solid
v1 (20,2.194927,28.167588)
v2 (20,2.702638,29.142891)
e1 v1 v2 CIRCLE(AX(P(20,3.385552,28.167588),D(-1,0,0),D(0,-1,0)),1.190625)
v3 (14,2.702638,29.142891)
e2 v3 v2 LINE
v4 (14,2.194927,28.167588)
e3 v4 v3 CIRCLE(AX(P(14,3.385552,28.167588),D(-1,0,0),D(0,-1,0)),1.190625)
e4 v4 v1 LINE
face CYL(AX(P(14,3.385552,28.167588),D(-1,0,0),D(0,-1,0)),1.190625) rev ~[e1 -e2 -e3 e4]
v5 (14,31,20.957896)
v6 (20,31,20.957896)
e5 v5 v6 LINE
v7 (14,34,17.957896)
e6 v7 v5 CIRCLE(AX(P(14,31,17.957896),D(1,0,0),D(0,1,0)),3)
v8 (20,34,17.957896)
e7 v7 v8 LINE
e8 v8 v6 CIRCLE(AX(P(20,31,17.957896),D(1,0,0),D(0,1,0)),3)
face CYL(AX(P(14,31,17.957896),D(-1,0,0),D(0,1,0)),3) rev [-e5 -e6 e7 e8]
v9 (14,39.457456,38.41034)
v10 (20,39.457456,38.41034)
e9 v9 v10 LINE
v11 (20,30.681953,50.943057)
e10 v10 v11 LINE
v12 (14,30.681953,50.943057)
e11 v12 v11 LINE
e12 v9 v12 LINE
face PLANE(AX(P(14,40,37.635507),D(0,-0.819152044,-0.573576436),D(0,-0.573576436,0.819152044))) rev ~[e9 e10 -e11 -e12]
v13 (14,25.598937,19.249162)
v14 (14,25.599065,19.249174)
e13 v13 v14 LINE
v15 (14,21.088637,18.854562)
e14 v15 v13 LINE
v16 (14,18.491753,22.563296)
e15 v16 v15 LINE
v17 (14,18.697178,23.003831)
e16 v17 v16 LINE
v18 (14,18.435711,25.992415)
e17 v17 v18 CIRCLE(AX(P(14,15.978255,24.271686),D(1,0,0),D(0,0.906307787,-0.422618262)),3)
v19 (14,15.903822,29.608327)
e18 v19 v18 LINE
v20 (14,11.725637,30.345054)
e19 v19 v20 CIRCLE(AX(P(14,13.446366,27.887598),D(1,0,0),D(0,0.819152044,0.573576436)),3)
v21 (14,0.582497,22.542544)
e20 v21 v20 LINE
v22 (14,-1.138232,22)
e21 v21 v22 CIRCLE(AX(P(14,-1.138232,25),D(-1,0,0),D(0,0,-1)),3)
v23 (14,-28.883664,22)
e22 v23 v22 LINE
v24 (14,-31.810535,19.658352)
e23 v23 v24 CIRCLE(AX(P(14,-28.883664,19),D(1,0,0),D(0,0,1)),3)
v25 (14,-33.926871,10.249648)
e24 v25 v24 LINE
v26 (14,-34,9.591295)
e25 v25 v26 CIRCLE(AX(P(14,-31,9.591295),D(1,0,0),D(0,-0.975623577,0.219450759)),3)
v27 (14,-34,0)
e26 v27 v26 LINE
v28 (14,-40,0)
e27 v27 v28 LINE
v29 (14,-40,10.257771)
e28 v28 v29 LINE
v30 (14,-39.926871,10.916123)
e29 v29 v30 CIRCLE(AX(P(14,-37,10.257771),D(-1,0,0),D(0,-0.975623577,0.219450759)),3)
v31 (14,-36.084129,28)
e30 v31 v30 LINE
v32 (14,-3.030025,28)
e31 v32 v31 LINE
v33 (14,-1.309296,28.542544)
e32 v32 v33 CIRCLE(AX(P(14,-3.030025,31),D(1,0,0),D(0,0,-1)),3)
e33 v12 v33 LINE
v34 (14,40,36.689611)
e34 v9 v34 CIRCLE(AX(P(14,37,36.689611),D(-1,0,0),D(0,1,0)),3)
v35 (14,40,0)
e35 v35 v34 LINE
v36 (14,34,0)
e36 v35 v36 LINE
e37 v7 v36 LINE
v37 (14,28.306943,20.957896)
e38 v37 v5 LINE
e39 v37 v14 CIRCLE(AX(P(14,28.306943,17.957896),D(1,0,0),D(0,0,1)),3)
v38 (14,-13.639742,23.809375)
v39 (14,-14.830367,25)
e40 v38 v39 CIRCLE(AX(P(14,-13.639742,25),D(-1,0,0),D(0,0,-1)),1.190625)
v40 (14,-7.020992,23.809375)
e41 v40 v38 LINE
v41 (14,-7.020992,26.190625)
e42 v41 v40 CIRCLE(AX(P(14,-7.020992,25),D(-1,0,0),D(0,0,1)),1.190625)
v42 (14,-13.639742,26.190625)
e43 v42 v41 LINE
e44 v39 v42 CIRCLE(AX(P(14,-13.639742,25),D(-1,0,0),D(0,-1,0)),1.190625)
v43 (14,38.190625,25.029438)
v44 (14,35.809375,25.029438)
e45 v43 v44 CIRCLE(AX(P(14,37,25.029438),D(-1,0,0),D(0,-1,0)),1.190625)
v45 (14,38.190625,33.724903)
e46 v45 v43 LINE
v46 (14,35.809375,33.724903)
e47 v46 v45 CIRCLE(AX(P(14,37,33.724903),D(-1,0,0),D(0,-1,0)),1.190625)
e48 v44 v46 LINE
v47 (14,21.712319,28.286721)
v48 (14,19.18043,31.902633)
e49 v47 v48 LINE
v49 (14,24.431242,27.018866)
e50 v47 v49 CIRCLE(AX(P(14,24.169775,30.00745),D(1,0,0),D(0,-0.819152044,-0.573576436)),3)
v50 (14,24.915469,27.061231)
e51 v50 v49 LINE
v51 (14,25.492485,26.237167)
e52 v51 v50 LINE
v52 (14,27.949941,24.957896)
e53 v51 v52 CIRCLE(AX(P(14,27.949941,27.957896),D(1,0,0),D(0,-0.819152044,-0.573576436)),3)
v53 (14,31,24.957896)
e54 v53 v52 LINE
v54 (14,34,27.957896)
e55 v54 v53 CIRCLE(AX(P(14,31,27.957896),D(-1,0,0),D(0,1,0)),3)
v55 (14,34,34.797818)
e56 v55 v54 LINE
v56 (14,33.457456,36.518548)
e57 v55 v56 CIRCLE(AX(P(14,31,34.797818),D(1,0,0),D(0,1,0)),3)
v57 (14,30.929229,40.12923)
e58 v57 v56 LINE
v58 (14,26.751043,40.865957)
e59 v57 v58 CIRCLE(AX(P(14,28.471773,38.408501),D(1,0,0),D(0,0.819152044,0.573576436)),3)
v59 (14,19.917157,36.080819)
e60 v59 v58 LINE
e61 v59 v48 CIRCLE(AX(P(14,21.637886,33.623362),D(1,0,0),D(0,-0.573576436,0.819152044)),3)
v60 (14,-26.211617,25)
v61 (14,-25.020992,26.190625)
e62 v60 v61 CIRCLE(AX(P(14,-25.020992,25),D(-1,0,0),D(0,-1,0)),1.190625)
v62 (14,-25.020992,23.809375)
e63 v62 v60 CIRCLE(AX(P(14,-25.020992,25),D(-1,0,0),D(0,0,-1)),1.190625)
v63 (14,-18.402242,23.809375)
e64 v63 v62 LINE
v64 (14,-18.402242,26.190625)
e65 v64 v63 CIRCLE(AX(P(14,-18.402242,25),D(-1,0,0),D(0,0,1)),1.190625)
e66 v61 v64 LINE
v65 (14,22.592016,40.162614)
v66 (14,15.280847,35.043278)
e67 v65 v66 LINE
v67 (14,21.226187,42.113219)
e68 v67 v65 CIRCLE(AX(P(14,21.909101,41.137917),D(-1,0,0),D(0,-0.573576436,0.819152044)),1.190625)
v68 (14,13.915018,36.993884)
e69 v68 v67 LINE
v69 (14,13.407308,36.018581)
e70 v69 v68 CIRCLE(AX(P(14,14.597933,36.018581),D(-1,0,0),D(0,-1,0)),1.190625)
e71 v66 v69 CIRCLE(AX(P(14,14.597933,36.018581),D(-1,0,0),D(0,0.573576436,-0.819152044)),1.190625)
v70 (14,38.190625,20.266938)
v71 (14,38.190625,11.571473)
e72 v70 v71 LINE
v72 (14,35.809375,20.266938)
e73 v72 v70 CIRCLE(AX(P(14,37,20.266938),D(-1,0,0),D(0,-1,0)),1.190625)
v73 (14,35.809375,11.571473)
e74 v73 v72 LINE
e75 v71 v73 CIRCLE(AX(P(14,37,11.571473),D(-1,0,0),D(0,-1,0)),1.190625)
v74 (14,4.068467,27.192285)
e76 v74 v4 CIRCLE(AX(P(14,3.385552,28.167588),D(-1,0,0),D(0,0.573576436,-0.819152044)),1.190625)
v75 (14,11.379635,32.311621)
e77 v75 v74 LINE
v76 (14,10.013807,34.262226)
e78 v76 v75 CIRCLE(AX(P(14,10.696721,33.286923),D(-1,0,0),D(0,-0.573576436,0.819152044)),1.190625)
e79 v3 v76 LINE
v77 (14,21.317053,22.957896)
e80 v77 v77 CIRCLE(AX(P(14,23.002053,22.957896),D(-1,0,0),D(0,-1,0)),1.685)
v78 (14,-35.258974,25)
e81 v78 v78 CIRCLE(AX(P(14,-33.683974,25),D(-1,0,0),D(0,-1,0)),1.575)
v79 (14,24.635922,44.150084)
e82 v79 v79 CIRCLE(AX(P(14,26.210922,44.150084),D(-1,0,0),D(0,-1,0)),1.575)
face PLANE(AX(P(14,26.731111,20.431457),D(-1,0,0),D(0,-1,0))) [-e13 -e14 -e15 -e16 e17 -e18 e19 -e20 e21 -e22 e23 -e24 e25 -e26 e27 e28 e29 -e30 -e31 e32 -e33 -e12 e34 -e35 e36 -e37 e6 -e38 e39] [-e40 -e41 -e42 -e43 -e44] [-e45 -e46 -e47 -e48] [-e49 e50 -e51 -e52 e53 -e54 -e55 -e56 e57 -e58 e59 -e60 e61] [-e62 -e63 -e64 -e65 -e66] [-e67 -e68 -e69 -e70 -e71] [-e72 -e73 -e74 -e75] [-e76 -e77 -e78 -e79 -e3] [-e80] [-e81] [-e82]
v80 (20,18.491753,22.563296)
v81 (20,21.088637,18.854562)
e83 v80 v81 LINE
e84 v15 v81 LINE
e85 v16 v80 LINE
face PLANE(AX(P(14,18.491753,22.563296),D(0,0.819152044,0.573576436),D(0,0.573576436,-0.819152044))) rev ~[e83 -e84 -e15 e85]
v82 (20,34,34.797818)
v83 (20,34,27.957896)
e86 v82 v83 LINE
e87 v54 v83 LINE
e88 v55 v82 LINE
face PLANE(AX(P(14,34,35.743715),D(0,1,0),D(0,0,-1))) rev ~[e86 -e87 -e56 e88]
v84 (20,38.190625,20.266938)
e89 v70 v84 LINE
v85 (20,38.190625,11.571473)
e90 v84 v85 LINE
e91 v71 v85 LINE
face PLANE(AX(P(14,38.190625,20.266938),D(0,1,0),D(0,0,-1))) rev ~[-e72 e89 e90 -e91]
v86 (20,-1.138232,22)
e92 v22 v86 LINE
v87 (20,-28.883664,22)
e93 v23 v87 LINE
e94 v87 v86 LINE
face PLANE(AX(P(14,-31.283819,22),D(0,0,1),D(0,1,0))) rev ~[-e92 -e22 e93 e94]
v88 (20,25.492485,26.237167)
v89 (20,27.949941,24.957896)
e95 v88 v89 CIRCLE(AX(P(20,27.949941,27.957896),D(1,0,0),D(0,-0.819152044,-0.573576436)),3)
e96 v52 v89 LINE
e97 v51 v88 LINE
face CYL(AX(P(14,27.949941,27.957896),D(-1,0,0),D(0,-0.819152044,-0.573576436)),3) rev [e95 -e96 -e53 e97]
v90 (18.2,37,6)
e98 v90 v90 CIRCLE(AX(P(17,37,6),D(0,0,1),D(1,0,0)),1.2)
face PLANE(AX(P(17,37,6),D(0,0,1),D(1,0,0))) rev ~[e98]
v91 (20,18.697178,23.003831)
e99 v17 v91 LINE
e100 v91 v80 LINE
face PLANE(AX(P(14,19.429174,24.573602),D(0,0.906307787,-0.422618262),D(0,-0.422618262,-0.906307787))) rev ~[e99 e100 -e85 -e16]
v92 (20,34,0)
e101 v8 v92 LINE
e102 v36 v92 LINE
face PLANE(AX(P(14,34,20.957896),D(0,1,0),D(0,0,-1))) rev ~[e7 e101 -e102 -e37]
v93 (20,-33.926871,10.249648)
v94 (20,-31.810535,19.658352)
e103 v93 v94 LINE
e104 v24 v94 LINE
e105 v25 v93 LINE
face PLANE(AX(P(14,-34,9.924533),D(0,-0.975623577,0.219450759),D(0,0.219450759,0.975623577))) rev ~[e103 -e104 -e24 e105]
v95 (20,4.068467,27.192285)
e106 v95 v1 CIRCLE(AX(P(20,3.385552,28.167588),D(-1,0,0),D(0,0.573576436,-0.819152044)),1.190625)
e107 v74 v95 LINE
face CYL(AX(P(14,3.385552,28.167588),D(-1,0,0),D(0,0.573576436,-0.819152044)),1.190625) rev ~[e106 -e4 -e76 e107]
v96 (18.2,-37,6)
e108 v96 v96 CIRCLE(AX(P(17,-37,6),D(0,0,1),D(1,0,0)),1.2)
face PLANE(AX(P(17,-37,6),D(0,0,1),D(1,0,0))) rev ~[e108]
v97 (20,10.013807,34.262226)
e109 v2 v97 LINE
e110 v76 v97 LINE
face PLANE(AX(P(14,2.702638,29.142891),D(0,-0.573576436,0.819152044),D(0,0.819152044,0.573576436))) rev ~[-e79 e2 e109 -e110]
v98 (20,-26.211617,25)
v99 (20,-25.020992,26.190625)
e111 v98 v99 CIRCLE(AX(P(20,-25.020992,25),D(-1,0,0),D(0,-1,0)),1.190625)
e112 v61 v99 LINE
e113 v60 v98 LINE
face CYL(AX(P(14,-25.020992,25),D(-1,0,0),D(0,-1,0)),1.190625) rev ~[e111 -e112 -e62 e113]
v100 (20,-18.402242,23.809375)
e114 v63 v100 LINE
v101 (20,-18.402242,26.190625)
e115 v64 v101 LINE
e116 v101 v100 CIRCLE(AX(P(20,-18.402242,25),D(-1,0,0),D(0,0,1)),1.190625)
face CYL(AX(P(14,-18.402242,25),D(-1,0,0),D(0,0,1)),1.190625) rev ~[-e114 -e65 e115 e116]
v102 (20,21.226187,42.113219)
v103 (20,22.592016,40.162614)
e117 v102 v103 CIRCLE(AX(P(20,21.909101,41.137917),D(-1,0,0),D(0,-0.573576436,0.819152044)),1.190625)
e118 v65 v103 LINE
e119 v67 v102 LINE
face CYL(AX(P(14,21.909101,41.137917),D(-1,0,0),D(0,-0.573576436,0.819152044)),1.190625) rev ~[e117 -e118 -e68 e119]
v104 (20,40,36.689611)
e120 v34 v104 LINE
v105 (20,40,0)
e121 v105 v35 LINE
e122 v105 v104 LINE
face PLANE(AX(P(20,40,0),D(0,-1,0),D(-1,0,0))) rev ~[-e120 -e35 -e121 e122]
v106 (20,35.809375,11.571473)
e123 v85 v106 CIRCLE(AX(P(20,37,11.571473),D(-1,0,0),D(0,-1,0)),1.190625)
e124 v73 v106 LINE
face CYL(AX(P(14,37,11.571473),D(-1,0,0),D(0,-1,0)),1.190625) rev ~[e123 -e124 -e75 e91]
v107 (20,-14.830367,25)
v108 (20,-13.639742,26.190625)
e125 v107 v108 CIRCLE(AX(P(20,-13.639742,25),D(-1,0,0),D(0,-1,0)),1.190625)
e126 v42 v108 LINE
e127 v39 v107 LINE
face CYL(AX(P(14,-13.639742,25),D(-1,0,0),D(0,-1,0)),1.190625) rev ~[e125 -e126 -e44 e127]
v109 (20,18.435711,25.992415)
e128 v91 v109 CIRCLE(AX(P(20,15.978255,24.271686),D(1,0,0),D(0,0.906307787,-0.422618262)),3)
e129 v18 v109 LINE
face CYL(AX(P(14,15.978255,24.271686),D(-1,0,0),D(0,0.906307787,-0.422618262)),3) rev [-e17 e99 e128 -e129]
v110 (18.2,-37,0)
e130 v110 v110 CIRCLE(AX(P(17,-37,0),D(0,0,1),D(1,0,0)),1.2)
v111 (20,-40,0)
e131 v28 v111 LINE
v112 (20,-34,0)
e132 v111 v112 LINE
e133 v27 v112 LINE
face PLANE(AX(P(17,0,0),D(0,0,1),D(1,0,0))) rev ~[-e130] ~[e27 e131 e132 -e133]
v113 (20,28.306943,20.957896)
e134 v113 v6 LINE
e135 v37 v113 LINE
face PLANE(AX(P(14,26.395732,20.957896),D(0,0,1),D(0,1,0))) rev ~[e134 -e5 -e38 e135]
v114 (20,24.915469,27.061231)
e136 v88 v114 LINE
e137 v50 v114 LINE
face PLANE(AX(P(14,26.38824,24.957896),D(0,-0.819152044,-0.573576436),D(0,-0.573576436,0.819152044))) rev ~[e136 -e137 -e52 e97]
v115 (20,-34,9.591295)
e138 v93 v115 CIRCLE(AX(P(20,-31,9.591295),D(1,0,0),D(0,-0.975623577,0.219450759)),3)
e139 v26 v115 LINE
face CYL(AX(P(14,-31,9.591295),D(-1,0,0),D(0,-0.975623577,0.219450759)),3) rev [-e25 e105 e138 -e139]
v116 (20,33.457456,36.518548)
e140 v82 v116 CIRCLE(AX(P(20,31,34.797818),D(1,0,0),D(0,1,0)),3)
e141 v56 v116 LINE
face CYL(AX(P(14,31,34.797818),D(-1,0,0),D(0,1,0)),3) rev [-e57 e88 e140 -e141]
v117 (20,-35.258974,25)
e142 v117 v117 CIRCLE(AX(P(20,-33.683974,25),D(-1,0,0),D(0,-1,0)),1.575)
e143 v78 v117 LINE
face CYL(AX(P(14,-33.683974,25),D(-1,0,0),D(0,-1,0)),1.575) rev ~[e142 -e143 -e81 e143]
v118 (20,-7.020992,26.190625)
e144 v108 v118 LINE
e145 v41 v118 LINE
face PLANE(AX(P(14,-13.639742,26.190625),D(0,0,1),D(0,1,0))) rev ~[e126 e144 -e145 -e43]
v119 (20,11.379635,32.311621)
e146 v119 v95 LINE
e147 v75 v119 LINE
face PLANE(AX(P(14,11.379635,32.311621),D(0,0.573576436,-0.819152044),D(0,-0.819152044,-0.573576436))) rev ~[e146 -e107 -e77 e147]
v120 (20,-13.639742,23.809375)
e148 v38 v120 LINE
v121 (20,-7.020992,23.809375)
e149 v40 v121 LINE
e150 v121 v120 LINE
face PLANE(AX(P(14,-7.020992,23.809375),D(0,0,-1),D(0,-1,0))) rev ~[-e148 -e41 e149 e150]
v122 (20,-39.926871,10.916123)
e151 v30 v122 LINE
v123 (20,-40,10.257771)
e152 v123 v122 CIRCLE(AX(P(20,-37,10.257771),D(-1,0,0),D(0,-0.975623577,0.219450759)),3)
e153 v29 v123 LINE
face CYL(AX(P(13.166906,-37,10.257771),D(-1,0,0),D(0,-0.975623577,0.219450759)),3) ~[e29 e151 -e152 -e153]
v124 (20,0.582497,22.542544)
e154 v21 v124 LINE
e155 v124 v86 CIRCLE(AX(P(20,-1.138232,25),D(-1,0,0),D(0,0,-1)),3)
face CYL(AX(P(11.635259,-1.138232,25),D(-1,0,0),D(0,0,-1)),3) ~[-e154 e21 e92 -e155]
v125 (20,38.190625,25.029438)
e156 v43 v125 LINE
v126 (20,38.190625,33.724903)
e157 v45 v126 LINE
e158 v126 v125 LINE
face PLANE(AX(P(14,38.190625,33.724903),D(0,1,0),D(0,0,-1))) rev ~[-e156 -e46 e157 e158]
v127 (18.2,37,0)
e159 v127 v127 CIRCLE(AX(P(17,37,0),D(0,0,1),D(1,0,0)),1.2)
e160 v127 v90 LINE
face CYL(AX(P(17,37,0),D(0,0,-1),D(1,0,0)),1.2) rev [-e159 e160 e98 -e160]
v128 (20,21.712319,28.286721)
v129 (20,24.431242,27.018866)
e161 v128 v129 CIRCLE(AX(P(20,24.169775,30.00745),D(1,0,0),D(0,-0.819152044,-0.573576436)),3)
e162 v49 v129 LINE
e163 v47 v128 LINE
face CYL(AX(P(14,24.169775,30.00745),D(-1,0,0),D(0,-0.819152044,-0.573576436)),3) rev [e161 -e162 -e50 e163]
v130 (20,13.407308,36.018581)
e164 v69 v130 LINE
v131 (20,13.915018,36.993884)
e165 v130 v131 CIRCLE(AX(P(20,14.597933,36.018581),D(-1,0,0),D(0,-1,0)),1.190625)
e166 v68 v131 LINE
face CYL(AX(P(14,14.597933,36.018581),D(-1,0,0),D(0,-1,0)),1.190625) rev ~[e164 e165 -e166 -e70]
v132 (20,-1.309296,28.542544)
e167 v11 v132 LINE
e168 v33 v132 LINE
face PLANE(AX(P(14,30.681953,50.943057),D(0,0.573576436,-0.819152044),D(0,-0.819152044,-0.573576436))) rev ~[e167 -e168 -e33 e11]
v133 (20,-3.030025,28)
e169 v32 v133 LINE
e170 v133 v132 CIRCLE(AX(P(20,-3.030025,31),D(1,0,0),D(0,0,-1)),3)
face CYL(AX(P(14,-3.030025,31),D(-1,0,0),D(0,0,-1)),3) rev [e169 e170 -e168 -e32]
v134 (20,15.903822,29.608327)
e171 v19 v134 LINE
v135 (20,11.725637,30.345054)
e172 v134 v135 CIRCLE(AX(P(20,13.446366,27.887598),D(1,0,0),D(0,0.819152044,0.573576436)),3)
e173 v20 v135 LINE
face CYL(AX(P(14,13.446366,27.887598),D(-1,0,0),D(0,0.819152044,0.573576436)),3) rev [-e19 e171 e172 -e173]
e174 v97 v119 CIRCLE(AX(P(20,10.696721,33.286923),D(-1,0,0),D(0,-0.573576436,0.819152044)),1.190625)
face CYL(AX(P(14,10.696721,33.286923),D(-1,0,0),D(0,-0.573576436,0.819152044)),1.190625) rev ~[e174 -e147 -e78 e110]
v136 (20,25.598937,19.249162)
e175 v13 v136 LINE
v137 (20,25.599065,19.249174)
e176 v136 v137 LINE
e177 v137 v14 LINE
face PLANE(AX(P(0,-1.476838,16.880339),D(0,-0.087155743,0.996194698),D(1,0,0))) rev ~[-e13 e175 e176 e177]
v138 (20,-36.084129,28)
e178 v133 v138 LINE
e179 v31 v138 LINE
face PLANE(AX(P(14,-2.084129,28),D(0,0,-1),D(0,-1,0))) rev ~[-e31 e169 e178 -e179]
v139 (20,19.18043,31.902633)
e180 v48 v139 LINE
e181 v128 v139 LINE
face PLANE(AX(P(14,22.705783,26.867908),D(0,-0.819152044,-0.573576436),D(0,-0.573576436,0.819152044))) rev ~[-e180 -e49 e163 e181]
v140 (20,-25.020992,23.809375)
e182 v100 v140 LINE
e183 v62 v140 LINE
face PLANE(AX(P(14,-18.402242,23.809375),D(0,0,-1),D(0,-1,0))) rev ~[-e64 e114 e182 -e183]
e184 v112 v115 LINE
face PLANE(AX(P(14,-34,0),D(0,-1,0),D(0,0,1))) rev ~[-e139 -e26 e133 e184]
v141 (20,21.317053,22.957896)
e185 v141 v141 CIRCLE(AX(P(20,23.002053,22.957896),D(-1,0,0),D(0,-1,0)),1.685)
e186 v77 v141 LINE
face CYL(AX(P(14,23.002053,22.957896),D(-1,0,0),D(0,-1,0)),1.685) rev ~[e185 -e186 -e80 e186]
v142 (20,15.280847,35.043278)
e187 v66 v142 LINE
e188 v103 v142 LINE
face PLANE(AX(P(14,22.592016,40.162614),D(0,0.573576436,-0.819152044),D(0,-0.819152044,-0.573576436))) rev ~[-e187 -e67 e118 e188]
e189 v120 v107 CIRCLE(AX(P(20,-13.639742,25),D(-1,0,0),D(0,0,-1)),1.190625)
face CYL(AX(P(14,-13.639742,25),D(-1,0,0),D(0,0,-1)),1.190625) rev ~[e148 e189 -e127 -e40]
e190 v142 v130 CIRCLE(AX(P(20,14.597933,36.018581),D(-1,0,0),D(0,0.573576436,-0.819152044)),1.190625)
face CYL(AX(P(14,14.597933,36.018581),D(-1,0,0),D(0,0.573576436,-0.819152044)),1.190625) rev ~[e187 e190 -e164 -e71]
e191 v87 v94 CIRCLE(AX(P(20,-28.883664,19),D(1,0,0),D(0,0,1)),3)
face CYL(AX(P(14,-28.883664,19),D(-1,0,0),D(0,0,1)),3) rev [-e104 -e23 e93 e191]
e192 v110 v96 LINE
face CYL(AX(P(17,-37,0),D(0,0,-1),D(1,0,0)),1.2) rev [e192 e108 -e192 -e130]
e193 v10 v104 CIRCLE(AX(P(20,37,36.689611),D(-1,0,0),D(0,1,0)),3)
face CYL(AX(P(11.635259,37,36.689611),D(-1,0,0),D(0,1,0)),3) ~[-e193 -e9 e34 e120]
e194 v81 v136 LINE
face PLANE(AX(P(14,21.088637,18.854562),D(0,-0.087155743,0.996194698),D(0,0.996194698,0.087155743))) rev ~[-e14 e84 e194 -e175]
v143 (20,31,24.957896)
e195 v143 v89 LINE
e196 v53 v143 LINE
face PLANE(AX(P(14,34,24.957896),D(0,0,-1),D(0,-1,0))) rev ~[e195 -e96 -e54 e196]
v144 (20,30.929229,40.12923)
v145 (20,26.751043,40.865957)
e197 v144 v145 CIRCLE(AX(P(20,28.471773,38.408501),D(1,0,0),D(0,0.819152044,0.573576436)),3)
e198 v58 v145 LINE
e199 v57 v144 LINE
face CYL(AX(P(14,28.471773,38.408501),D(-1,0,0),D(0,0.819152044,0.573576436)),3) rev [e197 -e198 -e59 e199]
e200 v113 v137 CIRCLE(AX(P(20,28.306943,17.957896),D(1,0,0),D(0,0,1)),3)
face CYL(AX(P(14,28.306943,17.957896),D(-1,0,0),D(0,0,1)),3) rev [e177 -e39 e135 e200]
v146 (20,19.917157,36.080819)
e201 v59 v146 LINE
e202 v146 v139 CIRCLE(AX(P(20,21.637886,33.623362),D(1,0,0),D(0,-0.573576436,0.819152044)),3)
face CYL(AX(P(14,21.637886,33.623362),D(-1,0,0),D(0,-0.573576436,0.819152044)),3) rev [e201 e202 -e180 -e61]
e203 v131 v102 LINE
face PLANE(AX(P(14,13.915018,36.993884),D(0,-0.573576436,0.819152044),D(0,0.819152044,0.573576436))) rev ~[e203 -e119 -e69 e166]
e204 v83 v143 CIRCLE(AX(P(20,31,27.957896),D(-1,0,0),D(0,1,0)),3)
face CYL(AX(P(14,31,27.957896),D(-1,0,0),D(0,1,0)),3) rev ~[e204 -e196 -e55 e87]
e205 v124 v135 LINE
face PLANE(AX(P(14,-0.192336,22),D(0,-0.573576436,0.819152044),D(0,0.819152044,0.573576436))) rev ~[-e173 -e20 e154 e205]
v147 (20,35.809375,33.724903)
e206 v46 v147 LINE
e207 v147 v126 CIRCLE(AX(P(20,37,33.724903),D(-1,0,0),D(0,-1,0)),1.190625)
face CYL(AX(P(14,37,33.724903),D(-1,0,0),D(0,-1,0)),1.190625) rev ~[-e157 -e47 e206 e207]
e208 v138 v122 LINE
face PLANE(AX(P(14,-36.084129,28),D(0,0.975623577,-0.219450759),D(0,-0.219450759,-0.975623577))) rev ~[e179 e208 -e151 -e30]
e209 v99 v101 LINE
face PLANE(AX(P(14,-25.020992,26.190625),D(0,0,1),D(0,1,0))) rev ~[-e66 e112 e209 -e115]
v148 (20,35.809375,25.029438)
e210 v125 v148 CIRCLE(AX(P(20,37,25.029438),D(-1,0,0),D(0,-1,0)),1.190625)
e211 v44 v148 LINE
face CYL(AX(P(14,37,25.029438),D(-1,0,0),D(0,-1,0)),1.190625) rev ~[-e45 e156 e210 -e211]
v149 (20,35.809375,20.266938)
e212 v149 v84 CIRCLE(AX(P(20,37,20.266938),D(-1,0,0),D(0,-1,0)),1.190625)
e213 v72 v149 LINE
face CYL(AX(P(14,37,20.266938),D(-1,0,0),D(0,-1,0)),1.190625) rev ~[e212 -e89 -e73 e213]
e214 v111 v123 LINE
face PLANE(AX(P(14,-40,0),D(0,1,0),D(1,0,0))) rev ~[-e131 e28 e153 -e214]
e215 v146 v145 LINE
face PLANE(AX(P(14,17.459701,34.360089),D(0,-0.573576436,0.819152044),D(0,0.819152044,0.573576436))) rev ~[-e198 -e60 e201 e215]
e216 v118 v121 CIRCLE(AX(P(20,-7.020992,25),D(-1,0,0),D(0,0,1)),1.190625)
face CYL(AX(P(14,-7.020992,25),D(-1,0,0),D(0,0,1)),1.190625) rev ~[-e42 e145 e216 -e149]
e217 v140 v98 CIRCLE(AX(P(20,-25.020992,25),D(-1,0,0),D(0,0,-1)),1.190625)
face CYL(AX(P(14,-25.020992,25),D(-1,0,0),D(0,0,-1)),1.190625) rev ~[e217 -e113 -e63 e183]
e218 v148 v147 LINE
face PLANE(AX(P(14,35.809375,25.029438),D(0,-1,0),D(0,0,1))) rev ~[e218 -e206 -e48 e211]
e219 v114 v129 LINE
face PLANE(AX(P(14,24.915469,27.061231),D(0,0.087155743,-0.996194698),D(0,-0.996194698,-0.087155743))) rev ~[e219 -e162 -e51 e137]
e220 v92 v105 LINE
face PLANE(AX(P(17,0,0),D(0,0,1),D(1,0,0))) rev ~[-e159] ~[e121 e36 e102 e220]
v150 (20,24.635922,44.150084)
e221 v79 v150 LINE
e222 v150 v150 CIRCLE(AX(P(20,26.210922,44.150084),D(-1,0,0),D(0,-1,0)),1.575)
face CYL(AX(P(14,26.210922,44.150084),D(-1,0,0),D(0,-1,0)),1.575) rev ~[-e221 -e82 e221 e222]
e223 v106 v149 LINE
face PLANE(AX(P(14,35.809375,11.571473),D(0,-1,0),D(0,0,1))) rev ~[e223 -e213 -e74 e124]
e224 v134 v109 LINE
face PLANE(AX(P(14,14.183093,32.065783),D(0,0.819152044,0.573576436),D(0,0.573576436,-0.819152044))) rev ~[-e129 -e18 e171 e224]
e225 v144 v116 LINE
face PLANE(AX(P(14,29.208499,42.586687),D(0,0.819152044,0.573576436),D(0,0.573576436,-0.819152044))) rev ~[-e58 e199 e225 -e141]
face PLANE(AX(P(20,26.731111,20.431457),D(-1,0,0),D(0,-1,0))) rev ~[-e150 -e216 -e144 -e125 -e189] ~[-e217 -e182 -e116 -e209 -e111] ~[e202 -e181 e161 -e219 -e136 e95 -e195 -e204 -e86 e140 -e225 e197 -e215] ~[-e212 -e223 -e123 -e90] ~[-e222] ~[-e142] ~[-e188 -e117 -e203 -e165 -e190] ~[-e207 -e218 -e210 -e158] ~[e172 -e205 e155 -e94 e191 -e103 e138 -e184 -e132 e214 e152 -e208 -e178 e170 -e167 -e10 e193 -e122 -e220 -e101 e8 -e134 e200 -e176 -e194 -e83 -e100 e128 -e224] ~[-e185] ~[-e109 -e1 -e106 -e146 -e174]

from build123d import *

# Parameters (mm, degrees)
F1_DEPTH     = 70
F2_R         = 1.685
F2_R_2       = 1.575
F3_DEPTH     = 25
F4_R         = 1.2
F5_DEPTH     = 6
F6_T1_DEPTH  = 6
F6_T6_DEPTH  = 6
F6_T8_DEPTH  = 10.7294818332
F6_T10_DEPTH = 7.6661885506


# Not quite as in the source:
# - a fillet or chamfer that OpenCascade refuses, or shapes differently, is made with other operations: its cross-section is extruded or revolved along the edge and cut away or added
# - a feature names something its author has since deleted; it is built from what else it names


with BuildPart() as f1:
    # F0 (on Top) → F1 (new body)
    with BuildSketch(Plane.XY):
        Polygon((20, 40), (14, 40), (14, 0), (14, -40), (20, -40), (20, 0), align=None)
    extrude(amount=F1_DEPTH)

    # F2 (on face) → F3 (cut)
    with BuildSketch(Plane(origin=(14, 0, 0), x_dir=(0, -1, 0), z_dir=(-1, 0, 0))):
        Polygon((-30.6819530985, 50.943057454), (2.084128673, 28), (36.084128673, 28), (40, 10.5910085265), (40, 70), (-40, 70), (-40, 37.635507345), align=None)
        Polygon((-34, 20.9578964859), (-34, 0), (34, 0), (34, 9.9245331063), (31.2838188449, 22), (0.1923359398, 22), (-14.1830926793, 32.0657834841), (-19.4291743712, 24.5736023727), (-18.4917532979, 22.5632963938), (-21.0886368482, 18.8545623277), (-25.5989365404, 19.2491624199), (-26.3957323212, 20.9578964859), align=None)
        Polygon((-34, 24.9578964859), (-26.3882395651, 24.9578964859), (-24.9154691321, 27.0612306442), (-22.7057825483, 26.8679081181), (-17.4597008565, 34.3600892295), (-29.2084994509, 42.5866865702), (-34, 35.7437146117), align=None)
        with Locations((-23.0020529902, 22.9578964859)):
            Circle(F2_R)
        with Locations((-26.2109216504, 44.1500837642)):
            Circle(F2_R_2)
        with Locations((33.683973759, 25)):
            Circle(F2_R_2)
        with BuildLine():
            Line((13.6397417612, 26.190625), (7.0209917612, 26.190625))
            ThreePointArc((7.0209917612, 26.190625), (7.8628907726, 25.8418990114), (8.2116167612, 25))
            ThreePointArc((8.2116167612, 25), (7.8628907726, 24.1581009886), (7.0209917612, 23.809375))
            Line((7.0209917612, 23.809375), (13.6397417612, 23.809375))
            ThreePointArc((13.6397417612, 23.809375), (12.4491167612, 25), (13.6397417612, 26.190625))
        make_face()
        with BuildLine():
            ThreePointArc((8.2116167612, 25), (7.8628907726, 25.8418990114), (7.0209917612, 26.190625))
            ThreePointArc((7.0209917612, 26.190625), (5.8303667612, 25), (7.0209917612, 23.809375))
            ThreePointArc((7.0209917612, 23.809375), (7.8628907726, 24.1581009886), (8.2116167612, 25))
        make_face()
        with BuildLine():
            ThreePointArc((14.8303667612, 25), (14.4816407726, 25.8418990114), (13.6397417612, 26.190625))
            ThreePointArc((13.6397417612, 26.190625), (12.4491167612, 25), (13.6397417612, 23.809375))
            ThreePointArc((13.6397417612, 23.809375), (14.4816407726, 24.1581009886), (14.8303667612, 25))
        make_face()
        with BuildLine():
            ThreePointArc((25.0209917612, 23.809375), (25.8628907726, 24.1581009886), (26.2116167612, 25))
            ThreePointArc((26.2116167612, 25), (25.8628907726, 25.8418990114), (25.0209917612, 26.190625))
            ThreePointArc((25.0209917612, 26.190625), (23.8303667612, 25), (25.0209917612, 23.809375))
        make_face()
        with BuildLine():
            ThreePointArc((25.0209917612, 23.809375), (23.8303667612, 25), (25.0209917612, 26.190625))
            Line((25.0209917612, 26.190625), (18.4022417612, 26.190625))
            ThreePointArc((18.4022417612, 26.190625), (19.2441407726, 25.8418990114), (19.5928667612, 25))
            ThreePointArc((19.5928667612, 25), (19.2441407726, 24.1581009886), (18.4022417612, 23.809375))
            Line((18.4022417612, 23.809375), (25.0209917612, 23.809375))
        make_face()
        with BuildLine():
            ThreePointArc((19.5928667612, 25), (19.2441407726, 25.8418990114), (18.4022417612, 26.190625))
            ThreePointArc((18.4022417612, 26.190625), (17.2116167612, 25), (18.4022417612, 23.809375))
            ThreePointArc((18.4022417612, 23.809375), (19.2441407726, 24.1581009886), (19.5928667612, 25))
        make_face()
        with BuildLine():
            ThreePointArc((-38.190625, 33.7249029726), (-37, 32.5342779726), (-35.809375, 33.7249029726))
            ThreePointArc((-35.809375, 33.7249029726), (-37, 34.9155279726), (-38.190625, 33.7249029726))
        make_face()
        with BuildLine():
            Line((-35.809375, 25.0294377416), (-35.809375, 33.7249029726))
            ThreePointArc((-35.809375, 33.7249029726), (-37, 32.5342779726), (-38.190625, 33.7249029726))
            Line((-38.190625, 33.7249029726), (-38.190625, 25.0294377416))
            ThreePointArc((-38.190625, 25.0294377416), (-37, 26.2200627416), (-35.809375, 25.0294377416))
        make_face()
        with BuildLine():
            ThreePointArc((-38.190625, 25.0294377416), (-37, 23.8388127416), (-35.809375, 25.0294377416))
            ThreePointArc((-35.809375, 25.0294377416), (-37, 26.2200627416), (-38.190625, 25.0294377416))
        make_face()
        with BuildLine():
            ThreePointArc((-38.190625, 11.5714725107), (-37, 10.3808475107), (-35.809375, 11.5714725107))
            ThreePointArc((-35.809375, 11.5714725107), (-37, 12.7620975107), (-38.190625, 11.5714725107))
        make_face()
        with BuildLine():
            ThreePointArc((-38.190625, 11.5714725107), (-37, 12.7620975107), (-35.809375, 11.5714725107))
            Line((-35.809375, 11.5714725107), (-35.809375, 20.2669377416))
            ThreePointArc((-35.809375, 20.2669377416), (-37, 19.0763127416), (-38.190625, 20.2669377416))
            Line((-38.190625, 20.2669377416), (-38.190625, 11.5714725107))
        make_face()
        with BuildLine():
            ThreePointArc((-38.190625, 20.2669377416), (-37, 19.0763127416), (-35.809375, 20.2669377416))
            ThreePointArc((-35.809375, 20.2669377416), (-37, 21.4575627416), (-38.190625, 20.2669377416))
        make_face()
        with BuildLine():
            ThreePointArc((-20.7184760846, 41.137916576), (-21.359331642, 40.0818193028), (-22.5920155292, 40.1626136733))
            Line((-22.5920155292, 40.1626136733), (-15.2808470158, 35.0432783671))
            ThreePointArc((-15.2808470158, 35.0432783671), (-15.573235474, 36.7014957144), (-13.9150181268, 36.9938841726))
            Line((-13.9150181268, 36.9938841726), (-21.2261866401, 42.1132194788))
            ThreePointArc((-21.2261866401, 42.1132194788), (-20.8530038114, 41.6876860187), (-20.7184760846, 41.137916576))
        make_face()
        with BuildLine():
            ThreePointArc((-21.2261866401, 42.1132194788), (-22.8844039874, 41.8208310206), (-22.5920155292, 40.1626136733))
            ThreePointArc((-22.5920155292, 40.1626136733), (-21.359331642, 40.0818193028), (-20.7184760846, 41.137916576))
            ThreePointArc((-20.7184760846, 41.137916576), (-20.8530038114, 41.6876860187), (-21.2261866401, 42.1132194788))
        make_face()
        with BuildLine():
            ThreePointArc((-13.9150181268, 36.9938841726), (-15.573235474, 36.7014957144), (-15.2808470158, 35.0432783671))
            ThreePointArc((-15.2808470158, 35.0432783671), (-14.0481631287, 34.9624839966), (-13.4073075713, 36.0185812699))
            ThreePointArc((-13.4073075713, 36.0185812699), (-13.541835298, 36.5683507125), (-13.9150181268, 36.9938841726))
        make_face()
        with BuildLine():
            ThreePointArc((-4.0684668916, 27.1922852829), (-2.8357830044, 27.1114909123), (-2.194927447, 28.1675881856))
            ThreePointArc((-2.194927447, 28.1675881856), (-2.3294551738, 28.7173576282), (-2.7026380025, 29.1428910883))
            ThreePointArc((-2.7026380025, 29.1428910883), (-4.3608553498, 28.8505026301), (-4.0684668916, 27.1922852829))
        make_face()
        with BuildLine():
            ThreePointArc((-4.0684668916, 27.1922852829), (-4.3608553498, 28.8505026301), (-2.7026380025, 29.1428910883))
            Line((-2.7026380025, 29.1428910883), (-10.0138065158, 34.2622263945))
            ThreePointArc((-10.0138065158, 34.2622263945), (-9.6406236871, 33.8366929344), (-9.5060959604, 33.2869234917))
            ThreePointArc((-9.5060959604, 33.2869234917), (-10.1469515177, 32.2308262185), (-11.3796354049, 32.311620589))
            Line((-11.3796354049, 32.311620589), (-4.0684668916, 27.1922852829))
        make_face()
        with BuildLine():
            ThreePointArc((-9.5060959604, 33.2869234917), (-9.6406236871, 33.8366929344), (-10.0138065158, 34.2622263945))
            ThreePointArc((-10.0138065158, 34.2622263945), (-11.6720238631, 33.9698379363), (-11.3796354049, 32.311620589))
            ThreePointArc((-11.3796354049, 32.311620589), (-10.1469515177, 32.2308262185), (-9.5060959604, 33.2869234917))
        make_face()
    extrude(amount=-F3_DEPTH, mode=Mode.SUBTRACT)

    # F4 (on face) → F5 (cut)
    with BuildSketch(Plane.XY):
        with Locations((17, 37)):
            Circle(F4_R)
        with Locations((17, -37)):
            Circle(F4_R)
    extrude(amount=F5_DEPTH, mode=Mode.SUBTRACT)

    # F6: fillet of radius 3 on 16 edges, made by hand

    # F6_s2 → F6_t1 (join)
    with BuildSketch(Plane.YZ.offset(14)):
        with BuildLine():
            ThreePointArc((21.7123190185, 28.286721078), (22.9019203662, 27.2885270259), (24.4312423796, 27.0188662927))
            Line((24.4312423796, 27.0188662927), (22.7057825483, 26.8679081181))
            Line((22.7057825483, 26.8679081181), (21.7123190185, 28.286721078))
        make_face()
        with BuildLine():
            ThreePointArc((25.4924845839, 26.2371671769), (26.564694877, 25.2968639864), (27.9499407167, 24.9578964859))
            Line((27.9499407167, 24.9578964859), (26.3882395651, 24.9578964859))
            Line((26.3882395651, 24.9578964859), (25.4924845839, 26.2371671769))
        make_face()
        with BuildLine():
            ThreePointArc((34, 27.9578964859), (33.1213203436, 25.8365761424), (31, 24.9578964859))
            Line((31, 24.9578964859), (34, 24.9578964859))
            Line((34, 24.9578964859), (34, 27.9578964859))
        make_face()
        with BuildLine():
            ThreePointArc((34, 34.7978182451), (33.8611508522, 35.6999356436), (33.4574561329, 36.5185475541))
            Line((33.4574561329, 36.5185475541), (34, 35.7437146117))
            Line((34, 35.7437146117), (34, 34.7978182451))
        make_face()
        with BuildLine():
            ThreePointArc((30.92922876, 40.1292304373), (28.9927171601, 41.3629243873), (26.751043318, 40.8659572611))
            Line((26.751043318, 40.8659572611), (29.2084994509, 42.5866865702))
            Line((29.2084994509, 42.5866865702), (30.92922876, 40.1292304373))
        make_face()
        with BuildLine():
            ThreePointArc((19.9171569894, 36.0808185386), (18.6834630394, 34.1443069387), (19.1804301656, 31.9026330966))
            Line((19.1804301656, 31.9026330966), (17.4597008565, 34.3600892295))
            Line((17.4597008565, 34.3600892295), (19.9171569894, 36.0808185386))
        make_face()
        with BuildLine():
            ThreePointArc((15.9038219884, 29.6083273512), (13.9673103885, 30.8420213012), (11.7256365465, 30.345054175))
            Line((11.7256365465, 30.345054175), (14.1830926793, 32.0657834841))
            Line((14.1830926793, 32.0657834841), (15.9038219884, 29.6083273512))
        make_face()
        with BuildLine():
            ThreePointArc((18.6971780696, 23.0038312383), (18.9668388028, 24.5331532517), (18.4357108414, 25.9924153326))
            Line((18.4357108414, 25.9924153326), (19.4291743712, 24.5736023727))
            Line((19.4291743712, 24.5736023727), (18.6971780696, 23.0038312383))
        make_face()
        with BuildLine():
            ThreePointArc((34, 17.9578964859), (33.1213203436, 20.0792168295), (31, 20.9578964859))
            Line((31, 20.9578964859), (34, 20.9578964859))
            Line((34, 20.9578964859), (34, 17.9578964859))
        make_face()
        with BuildLine():
            ThreePointArc((-28.8836639309, 22), (-30.7578228315, 21.3425474201), (-31.8105346625, 19.6583522769))
            Line((-31.8105346625, 19.6583522769), (-31.2838188449, 22))
            Line((-31.2838188449, 22), (-28.8836639309, 22))
        make_face()
        with BuildLine():
            ThreePointArc((-33.9268707316, 10.2496476731), (-33.9816616336, 9.9224960945), (-34, 9.5912953961))
            Line((-34, 9.5912953961), (-34, 9.9245331063))
            Line((-34, 9.9245331063), (-33.9268707316, 10.2496476731))
        make_face()
        with BuildLine():
            ThreePointArc((-3.0300250397, 28), (-2.1279076412, 28.1388491478), (-1.3092957306, 28.5425438671))
            Line((-1.3092957306, 28.5425438671), (-2.084128673, 28))
            Line((-2.084128673, 28), (-3.0300250397, 28))
        make_face()
    extrude(amount=F6_T1_DEPTH)


with BuildPart() as f6_tool4:
    # F6_s5 → F6_t6 (new body)
    with BuildSketch(Plane.YZ.offset(14)):
        with BuildLine():
            ThreePointArc((28.3069431036, 20.9578964859), (26.6950442786, 20.4880708234), (25.5880197425, 19.2257512711))
            Line((25.5880197425, 19.2257512711), (26.3957323212, 20.9578964859))
            Line((26.3957323212, 20.9578964859), (28.3069431036, 20.9578964859))
        make_face()
    extrude(amount=F6_T6_DEPTH)

    split(bisect_by=Plane(origin=(0, -1.4768383046, 16.8803390647), x_dir=(1, 0, 0), z_dir=(0, -0.0871557427, 0.9961946981)), keep=Keep.TOP)


with BuildPart() as f1_1:
    add(f1.part)

    # F6_t3: union F6_tool4
    add(f6_tool4.part)

    # F6_s9 → F6_t8 (cut)
    with BuildSketch(Plane.YZ.offset(11.6352590834)):
        with BuildLine():
            ThreePointArc((40, 36.6896109783), (39.8611508522, 37.5917283768), (39.4574561329, 38.4103402874))
            Line((39.4574561329, 38.4103402874), (40, 37.635507345))
            Line((40, 37.635507345), (40, 36.6896109783))
        make_face()
        with BuildLine():
            ThreePointArc((-1.1382323064, 22), (-0.2361149079, 22.1388491478), (0.5824970027, 22.5425438671))
            Line((0.5824970027, 22.5425438671), (-0.1923359398, 22))
            Line((-0.1923359398, 22), (-1.1382323064, 22))
        make_face()
    extrude(amount=F6_T8_DEPTH, mode=Mode.SUBTRACT)

    # F6_s11 → F6_t10 (cut)
    with BuildSketch(Plane.YZ.offset(13.1669057247)):
        with BuildLine():
            ThreePointArc((-39.9268707316, 10.9161230933), (-39.9816616336, 10.5889715148), (-40, 10.2577708164))
            Line((-40, 10.2577708164), (-40, 10.5910085265))
            Line((-40, 10.5910085265), (-39.9268707316, 10.9161230933))
        make_face()
    extrude(amount=F6_T10_DEPTH, mode=Mode.SUBTRACT)


solid = f1_1.part
